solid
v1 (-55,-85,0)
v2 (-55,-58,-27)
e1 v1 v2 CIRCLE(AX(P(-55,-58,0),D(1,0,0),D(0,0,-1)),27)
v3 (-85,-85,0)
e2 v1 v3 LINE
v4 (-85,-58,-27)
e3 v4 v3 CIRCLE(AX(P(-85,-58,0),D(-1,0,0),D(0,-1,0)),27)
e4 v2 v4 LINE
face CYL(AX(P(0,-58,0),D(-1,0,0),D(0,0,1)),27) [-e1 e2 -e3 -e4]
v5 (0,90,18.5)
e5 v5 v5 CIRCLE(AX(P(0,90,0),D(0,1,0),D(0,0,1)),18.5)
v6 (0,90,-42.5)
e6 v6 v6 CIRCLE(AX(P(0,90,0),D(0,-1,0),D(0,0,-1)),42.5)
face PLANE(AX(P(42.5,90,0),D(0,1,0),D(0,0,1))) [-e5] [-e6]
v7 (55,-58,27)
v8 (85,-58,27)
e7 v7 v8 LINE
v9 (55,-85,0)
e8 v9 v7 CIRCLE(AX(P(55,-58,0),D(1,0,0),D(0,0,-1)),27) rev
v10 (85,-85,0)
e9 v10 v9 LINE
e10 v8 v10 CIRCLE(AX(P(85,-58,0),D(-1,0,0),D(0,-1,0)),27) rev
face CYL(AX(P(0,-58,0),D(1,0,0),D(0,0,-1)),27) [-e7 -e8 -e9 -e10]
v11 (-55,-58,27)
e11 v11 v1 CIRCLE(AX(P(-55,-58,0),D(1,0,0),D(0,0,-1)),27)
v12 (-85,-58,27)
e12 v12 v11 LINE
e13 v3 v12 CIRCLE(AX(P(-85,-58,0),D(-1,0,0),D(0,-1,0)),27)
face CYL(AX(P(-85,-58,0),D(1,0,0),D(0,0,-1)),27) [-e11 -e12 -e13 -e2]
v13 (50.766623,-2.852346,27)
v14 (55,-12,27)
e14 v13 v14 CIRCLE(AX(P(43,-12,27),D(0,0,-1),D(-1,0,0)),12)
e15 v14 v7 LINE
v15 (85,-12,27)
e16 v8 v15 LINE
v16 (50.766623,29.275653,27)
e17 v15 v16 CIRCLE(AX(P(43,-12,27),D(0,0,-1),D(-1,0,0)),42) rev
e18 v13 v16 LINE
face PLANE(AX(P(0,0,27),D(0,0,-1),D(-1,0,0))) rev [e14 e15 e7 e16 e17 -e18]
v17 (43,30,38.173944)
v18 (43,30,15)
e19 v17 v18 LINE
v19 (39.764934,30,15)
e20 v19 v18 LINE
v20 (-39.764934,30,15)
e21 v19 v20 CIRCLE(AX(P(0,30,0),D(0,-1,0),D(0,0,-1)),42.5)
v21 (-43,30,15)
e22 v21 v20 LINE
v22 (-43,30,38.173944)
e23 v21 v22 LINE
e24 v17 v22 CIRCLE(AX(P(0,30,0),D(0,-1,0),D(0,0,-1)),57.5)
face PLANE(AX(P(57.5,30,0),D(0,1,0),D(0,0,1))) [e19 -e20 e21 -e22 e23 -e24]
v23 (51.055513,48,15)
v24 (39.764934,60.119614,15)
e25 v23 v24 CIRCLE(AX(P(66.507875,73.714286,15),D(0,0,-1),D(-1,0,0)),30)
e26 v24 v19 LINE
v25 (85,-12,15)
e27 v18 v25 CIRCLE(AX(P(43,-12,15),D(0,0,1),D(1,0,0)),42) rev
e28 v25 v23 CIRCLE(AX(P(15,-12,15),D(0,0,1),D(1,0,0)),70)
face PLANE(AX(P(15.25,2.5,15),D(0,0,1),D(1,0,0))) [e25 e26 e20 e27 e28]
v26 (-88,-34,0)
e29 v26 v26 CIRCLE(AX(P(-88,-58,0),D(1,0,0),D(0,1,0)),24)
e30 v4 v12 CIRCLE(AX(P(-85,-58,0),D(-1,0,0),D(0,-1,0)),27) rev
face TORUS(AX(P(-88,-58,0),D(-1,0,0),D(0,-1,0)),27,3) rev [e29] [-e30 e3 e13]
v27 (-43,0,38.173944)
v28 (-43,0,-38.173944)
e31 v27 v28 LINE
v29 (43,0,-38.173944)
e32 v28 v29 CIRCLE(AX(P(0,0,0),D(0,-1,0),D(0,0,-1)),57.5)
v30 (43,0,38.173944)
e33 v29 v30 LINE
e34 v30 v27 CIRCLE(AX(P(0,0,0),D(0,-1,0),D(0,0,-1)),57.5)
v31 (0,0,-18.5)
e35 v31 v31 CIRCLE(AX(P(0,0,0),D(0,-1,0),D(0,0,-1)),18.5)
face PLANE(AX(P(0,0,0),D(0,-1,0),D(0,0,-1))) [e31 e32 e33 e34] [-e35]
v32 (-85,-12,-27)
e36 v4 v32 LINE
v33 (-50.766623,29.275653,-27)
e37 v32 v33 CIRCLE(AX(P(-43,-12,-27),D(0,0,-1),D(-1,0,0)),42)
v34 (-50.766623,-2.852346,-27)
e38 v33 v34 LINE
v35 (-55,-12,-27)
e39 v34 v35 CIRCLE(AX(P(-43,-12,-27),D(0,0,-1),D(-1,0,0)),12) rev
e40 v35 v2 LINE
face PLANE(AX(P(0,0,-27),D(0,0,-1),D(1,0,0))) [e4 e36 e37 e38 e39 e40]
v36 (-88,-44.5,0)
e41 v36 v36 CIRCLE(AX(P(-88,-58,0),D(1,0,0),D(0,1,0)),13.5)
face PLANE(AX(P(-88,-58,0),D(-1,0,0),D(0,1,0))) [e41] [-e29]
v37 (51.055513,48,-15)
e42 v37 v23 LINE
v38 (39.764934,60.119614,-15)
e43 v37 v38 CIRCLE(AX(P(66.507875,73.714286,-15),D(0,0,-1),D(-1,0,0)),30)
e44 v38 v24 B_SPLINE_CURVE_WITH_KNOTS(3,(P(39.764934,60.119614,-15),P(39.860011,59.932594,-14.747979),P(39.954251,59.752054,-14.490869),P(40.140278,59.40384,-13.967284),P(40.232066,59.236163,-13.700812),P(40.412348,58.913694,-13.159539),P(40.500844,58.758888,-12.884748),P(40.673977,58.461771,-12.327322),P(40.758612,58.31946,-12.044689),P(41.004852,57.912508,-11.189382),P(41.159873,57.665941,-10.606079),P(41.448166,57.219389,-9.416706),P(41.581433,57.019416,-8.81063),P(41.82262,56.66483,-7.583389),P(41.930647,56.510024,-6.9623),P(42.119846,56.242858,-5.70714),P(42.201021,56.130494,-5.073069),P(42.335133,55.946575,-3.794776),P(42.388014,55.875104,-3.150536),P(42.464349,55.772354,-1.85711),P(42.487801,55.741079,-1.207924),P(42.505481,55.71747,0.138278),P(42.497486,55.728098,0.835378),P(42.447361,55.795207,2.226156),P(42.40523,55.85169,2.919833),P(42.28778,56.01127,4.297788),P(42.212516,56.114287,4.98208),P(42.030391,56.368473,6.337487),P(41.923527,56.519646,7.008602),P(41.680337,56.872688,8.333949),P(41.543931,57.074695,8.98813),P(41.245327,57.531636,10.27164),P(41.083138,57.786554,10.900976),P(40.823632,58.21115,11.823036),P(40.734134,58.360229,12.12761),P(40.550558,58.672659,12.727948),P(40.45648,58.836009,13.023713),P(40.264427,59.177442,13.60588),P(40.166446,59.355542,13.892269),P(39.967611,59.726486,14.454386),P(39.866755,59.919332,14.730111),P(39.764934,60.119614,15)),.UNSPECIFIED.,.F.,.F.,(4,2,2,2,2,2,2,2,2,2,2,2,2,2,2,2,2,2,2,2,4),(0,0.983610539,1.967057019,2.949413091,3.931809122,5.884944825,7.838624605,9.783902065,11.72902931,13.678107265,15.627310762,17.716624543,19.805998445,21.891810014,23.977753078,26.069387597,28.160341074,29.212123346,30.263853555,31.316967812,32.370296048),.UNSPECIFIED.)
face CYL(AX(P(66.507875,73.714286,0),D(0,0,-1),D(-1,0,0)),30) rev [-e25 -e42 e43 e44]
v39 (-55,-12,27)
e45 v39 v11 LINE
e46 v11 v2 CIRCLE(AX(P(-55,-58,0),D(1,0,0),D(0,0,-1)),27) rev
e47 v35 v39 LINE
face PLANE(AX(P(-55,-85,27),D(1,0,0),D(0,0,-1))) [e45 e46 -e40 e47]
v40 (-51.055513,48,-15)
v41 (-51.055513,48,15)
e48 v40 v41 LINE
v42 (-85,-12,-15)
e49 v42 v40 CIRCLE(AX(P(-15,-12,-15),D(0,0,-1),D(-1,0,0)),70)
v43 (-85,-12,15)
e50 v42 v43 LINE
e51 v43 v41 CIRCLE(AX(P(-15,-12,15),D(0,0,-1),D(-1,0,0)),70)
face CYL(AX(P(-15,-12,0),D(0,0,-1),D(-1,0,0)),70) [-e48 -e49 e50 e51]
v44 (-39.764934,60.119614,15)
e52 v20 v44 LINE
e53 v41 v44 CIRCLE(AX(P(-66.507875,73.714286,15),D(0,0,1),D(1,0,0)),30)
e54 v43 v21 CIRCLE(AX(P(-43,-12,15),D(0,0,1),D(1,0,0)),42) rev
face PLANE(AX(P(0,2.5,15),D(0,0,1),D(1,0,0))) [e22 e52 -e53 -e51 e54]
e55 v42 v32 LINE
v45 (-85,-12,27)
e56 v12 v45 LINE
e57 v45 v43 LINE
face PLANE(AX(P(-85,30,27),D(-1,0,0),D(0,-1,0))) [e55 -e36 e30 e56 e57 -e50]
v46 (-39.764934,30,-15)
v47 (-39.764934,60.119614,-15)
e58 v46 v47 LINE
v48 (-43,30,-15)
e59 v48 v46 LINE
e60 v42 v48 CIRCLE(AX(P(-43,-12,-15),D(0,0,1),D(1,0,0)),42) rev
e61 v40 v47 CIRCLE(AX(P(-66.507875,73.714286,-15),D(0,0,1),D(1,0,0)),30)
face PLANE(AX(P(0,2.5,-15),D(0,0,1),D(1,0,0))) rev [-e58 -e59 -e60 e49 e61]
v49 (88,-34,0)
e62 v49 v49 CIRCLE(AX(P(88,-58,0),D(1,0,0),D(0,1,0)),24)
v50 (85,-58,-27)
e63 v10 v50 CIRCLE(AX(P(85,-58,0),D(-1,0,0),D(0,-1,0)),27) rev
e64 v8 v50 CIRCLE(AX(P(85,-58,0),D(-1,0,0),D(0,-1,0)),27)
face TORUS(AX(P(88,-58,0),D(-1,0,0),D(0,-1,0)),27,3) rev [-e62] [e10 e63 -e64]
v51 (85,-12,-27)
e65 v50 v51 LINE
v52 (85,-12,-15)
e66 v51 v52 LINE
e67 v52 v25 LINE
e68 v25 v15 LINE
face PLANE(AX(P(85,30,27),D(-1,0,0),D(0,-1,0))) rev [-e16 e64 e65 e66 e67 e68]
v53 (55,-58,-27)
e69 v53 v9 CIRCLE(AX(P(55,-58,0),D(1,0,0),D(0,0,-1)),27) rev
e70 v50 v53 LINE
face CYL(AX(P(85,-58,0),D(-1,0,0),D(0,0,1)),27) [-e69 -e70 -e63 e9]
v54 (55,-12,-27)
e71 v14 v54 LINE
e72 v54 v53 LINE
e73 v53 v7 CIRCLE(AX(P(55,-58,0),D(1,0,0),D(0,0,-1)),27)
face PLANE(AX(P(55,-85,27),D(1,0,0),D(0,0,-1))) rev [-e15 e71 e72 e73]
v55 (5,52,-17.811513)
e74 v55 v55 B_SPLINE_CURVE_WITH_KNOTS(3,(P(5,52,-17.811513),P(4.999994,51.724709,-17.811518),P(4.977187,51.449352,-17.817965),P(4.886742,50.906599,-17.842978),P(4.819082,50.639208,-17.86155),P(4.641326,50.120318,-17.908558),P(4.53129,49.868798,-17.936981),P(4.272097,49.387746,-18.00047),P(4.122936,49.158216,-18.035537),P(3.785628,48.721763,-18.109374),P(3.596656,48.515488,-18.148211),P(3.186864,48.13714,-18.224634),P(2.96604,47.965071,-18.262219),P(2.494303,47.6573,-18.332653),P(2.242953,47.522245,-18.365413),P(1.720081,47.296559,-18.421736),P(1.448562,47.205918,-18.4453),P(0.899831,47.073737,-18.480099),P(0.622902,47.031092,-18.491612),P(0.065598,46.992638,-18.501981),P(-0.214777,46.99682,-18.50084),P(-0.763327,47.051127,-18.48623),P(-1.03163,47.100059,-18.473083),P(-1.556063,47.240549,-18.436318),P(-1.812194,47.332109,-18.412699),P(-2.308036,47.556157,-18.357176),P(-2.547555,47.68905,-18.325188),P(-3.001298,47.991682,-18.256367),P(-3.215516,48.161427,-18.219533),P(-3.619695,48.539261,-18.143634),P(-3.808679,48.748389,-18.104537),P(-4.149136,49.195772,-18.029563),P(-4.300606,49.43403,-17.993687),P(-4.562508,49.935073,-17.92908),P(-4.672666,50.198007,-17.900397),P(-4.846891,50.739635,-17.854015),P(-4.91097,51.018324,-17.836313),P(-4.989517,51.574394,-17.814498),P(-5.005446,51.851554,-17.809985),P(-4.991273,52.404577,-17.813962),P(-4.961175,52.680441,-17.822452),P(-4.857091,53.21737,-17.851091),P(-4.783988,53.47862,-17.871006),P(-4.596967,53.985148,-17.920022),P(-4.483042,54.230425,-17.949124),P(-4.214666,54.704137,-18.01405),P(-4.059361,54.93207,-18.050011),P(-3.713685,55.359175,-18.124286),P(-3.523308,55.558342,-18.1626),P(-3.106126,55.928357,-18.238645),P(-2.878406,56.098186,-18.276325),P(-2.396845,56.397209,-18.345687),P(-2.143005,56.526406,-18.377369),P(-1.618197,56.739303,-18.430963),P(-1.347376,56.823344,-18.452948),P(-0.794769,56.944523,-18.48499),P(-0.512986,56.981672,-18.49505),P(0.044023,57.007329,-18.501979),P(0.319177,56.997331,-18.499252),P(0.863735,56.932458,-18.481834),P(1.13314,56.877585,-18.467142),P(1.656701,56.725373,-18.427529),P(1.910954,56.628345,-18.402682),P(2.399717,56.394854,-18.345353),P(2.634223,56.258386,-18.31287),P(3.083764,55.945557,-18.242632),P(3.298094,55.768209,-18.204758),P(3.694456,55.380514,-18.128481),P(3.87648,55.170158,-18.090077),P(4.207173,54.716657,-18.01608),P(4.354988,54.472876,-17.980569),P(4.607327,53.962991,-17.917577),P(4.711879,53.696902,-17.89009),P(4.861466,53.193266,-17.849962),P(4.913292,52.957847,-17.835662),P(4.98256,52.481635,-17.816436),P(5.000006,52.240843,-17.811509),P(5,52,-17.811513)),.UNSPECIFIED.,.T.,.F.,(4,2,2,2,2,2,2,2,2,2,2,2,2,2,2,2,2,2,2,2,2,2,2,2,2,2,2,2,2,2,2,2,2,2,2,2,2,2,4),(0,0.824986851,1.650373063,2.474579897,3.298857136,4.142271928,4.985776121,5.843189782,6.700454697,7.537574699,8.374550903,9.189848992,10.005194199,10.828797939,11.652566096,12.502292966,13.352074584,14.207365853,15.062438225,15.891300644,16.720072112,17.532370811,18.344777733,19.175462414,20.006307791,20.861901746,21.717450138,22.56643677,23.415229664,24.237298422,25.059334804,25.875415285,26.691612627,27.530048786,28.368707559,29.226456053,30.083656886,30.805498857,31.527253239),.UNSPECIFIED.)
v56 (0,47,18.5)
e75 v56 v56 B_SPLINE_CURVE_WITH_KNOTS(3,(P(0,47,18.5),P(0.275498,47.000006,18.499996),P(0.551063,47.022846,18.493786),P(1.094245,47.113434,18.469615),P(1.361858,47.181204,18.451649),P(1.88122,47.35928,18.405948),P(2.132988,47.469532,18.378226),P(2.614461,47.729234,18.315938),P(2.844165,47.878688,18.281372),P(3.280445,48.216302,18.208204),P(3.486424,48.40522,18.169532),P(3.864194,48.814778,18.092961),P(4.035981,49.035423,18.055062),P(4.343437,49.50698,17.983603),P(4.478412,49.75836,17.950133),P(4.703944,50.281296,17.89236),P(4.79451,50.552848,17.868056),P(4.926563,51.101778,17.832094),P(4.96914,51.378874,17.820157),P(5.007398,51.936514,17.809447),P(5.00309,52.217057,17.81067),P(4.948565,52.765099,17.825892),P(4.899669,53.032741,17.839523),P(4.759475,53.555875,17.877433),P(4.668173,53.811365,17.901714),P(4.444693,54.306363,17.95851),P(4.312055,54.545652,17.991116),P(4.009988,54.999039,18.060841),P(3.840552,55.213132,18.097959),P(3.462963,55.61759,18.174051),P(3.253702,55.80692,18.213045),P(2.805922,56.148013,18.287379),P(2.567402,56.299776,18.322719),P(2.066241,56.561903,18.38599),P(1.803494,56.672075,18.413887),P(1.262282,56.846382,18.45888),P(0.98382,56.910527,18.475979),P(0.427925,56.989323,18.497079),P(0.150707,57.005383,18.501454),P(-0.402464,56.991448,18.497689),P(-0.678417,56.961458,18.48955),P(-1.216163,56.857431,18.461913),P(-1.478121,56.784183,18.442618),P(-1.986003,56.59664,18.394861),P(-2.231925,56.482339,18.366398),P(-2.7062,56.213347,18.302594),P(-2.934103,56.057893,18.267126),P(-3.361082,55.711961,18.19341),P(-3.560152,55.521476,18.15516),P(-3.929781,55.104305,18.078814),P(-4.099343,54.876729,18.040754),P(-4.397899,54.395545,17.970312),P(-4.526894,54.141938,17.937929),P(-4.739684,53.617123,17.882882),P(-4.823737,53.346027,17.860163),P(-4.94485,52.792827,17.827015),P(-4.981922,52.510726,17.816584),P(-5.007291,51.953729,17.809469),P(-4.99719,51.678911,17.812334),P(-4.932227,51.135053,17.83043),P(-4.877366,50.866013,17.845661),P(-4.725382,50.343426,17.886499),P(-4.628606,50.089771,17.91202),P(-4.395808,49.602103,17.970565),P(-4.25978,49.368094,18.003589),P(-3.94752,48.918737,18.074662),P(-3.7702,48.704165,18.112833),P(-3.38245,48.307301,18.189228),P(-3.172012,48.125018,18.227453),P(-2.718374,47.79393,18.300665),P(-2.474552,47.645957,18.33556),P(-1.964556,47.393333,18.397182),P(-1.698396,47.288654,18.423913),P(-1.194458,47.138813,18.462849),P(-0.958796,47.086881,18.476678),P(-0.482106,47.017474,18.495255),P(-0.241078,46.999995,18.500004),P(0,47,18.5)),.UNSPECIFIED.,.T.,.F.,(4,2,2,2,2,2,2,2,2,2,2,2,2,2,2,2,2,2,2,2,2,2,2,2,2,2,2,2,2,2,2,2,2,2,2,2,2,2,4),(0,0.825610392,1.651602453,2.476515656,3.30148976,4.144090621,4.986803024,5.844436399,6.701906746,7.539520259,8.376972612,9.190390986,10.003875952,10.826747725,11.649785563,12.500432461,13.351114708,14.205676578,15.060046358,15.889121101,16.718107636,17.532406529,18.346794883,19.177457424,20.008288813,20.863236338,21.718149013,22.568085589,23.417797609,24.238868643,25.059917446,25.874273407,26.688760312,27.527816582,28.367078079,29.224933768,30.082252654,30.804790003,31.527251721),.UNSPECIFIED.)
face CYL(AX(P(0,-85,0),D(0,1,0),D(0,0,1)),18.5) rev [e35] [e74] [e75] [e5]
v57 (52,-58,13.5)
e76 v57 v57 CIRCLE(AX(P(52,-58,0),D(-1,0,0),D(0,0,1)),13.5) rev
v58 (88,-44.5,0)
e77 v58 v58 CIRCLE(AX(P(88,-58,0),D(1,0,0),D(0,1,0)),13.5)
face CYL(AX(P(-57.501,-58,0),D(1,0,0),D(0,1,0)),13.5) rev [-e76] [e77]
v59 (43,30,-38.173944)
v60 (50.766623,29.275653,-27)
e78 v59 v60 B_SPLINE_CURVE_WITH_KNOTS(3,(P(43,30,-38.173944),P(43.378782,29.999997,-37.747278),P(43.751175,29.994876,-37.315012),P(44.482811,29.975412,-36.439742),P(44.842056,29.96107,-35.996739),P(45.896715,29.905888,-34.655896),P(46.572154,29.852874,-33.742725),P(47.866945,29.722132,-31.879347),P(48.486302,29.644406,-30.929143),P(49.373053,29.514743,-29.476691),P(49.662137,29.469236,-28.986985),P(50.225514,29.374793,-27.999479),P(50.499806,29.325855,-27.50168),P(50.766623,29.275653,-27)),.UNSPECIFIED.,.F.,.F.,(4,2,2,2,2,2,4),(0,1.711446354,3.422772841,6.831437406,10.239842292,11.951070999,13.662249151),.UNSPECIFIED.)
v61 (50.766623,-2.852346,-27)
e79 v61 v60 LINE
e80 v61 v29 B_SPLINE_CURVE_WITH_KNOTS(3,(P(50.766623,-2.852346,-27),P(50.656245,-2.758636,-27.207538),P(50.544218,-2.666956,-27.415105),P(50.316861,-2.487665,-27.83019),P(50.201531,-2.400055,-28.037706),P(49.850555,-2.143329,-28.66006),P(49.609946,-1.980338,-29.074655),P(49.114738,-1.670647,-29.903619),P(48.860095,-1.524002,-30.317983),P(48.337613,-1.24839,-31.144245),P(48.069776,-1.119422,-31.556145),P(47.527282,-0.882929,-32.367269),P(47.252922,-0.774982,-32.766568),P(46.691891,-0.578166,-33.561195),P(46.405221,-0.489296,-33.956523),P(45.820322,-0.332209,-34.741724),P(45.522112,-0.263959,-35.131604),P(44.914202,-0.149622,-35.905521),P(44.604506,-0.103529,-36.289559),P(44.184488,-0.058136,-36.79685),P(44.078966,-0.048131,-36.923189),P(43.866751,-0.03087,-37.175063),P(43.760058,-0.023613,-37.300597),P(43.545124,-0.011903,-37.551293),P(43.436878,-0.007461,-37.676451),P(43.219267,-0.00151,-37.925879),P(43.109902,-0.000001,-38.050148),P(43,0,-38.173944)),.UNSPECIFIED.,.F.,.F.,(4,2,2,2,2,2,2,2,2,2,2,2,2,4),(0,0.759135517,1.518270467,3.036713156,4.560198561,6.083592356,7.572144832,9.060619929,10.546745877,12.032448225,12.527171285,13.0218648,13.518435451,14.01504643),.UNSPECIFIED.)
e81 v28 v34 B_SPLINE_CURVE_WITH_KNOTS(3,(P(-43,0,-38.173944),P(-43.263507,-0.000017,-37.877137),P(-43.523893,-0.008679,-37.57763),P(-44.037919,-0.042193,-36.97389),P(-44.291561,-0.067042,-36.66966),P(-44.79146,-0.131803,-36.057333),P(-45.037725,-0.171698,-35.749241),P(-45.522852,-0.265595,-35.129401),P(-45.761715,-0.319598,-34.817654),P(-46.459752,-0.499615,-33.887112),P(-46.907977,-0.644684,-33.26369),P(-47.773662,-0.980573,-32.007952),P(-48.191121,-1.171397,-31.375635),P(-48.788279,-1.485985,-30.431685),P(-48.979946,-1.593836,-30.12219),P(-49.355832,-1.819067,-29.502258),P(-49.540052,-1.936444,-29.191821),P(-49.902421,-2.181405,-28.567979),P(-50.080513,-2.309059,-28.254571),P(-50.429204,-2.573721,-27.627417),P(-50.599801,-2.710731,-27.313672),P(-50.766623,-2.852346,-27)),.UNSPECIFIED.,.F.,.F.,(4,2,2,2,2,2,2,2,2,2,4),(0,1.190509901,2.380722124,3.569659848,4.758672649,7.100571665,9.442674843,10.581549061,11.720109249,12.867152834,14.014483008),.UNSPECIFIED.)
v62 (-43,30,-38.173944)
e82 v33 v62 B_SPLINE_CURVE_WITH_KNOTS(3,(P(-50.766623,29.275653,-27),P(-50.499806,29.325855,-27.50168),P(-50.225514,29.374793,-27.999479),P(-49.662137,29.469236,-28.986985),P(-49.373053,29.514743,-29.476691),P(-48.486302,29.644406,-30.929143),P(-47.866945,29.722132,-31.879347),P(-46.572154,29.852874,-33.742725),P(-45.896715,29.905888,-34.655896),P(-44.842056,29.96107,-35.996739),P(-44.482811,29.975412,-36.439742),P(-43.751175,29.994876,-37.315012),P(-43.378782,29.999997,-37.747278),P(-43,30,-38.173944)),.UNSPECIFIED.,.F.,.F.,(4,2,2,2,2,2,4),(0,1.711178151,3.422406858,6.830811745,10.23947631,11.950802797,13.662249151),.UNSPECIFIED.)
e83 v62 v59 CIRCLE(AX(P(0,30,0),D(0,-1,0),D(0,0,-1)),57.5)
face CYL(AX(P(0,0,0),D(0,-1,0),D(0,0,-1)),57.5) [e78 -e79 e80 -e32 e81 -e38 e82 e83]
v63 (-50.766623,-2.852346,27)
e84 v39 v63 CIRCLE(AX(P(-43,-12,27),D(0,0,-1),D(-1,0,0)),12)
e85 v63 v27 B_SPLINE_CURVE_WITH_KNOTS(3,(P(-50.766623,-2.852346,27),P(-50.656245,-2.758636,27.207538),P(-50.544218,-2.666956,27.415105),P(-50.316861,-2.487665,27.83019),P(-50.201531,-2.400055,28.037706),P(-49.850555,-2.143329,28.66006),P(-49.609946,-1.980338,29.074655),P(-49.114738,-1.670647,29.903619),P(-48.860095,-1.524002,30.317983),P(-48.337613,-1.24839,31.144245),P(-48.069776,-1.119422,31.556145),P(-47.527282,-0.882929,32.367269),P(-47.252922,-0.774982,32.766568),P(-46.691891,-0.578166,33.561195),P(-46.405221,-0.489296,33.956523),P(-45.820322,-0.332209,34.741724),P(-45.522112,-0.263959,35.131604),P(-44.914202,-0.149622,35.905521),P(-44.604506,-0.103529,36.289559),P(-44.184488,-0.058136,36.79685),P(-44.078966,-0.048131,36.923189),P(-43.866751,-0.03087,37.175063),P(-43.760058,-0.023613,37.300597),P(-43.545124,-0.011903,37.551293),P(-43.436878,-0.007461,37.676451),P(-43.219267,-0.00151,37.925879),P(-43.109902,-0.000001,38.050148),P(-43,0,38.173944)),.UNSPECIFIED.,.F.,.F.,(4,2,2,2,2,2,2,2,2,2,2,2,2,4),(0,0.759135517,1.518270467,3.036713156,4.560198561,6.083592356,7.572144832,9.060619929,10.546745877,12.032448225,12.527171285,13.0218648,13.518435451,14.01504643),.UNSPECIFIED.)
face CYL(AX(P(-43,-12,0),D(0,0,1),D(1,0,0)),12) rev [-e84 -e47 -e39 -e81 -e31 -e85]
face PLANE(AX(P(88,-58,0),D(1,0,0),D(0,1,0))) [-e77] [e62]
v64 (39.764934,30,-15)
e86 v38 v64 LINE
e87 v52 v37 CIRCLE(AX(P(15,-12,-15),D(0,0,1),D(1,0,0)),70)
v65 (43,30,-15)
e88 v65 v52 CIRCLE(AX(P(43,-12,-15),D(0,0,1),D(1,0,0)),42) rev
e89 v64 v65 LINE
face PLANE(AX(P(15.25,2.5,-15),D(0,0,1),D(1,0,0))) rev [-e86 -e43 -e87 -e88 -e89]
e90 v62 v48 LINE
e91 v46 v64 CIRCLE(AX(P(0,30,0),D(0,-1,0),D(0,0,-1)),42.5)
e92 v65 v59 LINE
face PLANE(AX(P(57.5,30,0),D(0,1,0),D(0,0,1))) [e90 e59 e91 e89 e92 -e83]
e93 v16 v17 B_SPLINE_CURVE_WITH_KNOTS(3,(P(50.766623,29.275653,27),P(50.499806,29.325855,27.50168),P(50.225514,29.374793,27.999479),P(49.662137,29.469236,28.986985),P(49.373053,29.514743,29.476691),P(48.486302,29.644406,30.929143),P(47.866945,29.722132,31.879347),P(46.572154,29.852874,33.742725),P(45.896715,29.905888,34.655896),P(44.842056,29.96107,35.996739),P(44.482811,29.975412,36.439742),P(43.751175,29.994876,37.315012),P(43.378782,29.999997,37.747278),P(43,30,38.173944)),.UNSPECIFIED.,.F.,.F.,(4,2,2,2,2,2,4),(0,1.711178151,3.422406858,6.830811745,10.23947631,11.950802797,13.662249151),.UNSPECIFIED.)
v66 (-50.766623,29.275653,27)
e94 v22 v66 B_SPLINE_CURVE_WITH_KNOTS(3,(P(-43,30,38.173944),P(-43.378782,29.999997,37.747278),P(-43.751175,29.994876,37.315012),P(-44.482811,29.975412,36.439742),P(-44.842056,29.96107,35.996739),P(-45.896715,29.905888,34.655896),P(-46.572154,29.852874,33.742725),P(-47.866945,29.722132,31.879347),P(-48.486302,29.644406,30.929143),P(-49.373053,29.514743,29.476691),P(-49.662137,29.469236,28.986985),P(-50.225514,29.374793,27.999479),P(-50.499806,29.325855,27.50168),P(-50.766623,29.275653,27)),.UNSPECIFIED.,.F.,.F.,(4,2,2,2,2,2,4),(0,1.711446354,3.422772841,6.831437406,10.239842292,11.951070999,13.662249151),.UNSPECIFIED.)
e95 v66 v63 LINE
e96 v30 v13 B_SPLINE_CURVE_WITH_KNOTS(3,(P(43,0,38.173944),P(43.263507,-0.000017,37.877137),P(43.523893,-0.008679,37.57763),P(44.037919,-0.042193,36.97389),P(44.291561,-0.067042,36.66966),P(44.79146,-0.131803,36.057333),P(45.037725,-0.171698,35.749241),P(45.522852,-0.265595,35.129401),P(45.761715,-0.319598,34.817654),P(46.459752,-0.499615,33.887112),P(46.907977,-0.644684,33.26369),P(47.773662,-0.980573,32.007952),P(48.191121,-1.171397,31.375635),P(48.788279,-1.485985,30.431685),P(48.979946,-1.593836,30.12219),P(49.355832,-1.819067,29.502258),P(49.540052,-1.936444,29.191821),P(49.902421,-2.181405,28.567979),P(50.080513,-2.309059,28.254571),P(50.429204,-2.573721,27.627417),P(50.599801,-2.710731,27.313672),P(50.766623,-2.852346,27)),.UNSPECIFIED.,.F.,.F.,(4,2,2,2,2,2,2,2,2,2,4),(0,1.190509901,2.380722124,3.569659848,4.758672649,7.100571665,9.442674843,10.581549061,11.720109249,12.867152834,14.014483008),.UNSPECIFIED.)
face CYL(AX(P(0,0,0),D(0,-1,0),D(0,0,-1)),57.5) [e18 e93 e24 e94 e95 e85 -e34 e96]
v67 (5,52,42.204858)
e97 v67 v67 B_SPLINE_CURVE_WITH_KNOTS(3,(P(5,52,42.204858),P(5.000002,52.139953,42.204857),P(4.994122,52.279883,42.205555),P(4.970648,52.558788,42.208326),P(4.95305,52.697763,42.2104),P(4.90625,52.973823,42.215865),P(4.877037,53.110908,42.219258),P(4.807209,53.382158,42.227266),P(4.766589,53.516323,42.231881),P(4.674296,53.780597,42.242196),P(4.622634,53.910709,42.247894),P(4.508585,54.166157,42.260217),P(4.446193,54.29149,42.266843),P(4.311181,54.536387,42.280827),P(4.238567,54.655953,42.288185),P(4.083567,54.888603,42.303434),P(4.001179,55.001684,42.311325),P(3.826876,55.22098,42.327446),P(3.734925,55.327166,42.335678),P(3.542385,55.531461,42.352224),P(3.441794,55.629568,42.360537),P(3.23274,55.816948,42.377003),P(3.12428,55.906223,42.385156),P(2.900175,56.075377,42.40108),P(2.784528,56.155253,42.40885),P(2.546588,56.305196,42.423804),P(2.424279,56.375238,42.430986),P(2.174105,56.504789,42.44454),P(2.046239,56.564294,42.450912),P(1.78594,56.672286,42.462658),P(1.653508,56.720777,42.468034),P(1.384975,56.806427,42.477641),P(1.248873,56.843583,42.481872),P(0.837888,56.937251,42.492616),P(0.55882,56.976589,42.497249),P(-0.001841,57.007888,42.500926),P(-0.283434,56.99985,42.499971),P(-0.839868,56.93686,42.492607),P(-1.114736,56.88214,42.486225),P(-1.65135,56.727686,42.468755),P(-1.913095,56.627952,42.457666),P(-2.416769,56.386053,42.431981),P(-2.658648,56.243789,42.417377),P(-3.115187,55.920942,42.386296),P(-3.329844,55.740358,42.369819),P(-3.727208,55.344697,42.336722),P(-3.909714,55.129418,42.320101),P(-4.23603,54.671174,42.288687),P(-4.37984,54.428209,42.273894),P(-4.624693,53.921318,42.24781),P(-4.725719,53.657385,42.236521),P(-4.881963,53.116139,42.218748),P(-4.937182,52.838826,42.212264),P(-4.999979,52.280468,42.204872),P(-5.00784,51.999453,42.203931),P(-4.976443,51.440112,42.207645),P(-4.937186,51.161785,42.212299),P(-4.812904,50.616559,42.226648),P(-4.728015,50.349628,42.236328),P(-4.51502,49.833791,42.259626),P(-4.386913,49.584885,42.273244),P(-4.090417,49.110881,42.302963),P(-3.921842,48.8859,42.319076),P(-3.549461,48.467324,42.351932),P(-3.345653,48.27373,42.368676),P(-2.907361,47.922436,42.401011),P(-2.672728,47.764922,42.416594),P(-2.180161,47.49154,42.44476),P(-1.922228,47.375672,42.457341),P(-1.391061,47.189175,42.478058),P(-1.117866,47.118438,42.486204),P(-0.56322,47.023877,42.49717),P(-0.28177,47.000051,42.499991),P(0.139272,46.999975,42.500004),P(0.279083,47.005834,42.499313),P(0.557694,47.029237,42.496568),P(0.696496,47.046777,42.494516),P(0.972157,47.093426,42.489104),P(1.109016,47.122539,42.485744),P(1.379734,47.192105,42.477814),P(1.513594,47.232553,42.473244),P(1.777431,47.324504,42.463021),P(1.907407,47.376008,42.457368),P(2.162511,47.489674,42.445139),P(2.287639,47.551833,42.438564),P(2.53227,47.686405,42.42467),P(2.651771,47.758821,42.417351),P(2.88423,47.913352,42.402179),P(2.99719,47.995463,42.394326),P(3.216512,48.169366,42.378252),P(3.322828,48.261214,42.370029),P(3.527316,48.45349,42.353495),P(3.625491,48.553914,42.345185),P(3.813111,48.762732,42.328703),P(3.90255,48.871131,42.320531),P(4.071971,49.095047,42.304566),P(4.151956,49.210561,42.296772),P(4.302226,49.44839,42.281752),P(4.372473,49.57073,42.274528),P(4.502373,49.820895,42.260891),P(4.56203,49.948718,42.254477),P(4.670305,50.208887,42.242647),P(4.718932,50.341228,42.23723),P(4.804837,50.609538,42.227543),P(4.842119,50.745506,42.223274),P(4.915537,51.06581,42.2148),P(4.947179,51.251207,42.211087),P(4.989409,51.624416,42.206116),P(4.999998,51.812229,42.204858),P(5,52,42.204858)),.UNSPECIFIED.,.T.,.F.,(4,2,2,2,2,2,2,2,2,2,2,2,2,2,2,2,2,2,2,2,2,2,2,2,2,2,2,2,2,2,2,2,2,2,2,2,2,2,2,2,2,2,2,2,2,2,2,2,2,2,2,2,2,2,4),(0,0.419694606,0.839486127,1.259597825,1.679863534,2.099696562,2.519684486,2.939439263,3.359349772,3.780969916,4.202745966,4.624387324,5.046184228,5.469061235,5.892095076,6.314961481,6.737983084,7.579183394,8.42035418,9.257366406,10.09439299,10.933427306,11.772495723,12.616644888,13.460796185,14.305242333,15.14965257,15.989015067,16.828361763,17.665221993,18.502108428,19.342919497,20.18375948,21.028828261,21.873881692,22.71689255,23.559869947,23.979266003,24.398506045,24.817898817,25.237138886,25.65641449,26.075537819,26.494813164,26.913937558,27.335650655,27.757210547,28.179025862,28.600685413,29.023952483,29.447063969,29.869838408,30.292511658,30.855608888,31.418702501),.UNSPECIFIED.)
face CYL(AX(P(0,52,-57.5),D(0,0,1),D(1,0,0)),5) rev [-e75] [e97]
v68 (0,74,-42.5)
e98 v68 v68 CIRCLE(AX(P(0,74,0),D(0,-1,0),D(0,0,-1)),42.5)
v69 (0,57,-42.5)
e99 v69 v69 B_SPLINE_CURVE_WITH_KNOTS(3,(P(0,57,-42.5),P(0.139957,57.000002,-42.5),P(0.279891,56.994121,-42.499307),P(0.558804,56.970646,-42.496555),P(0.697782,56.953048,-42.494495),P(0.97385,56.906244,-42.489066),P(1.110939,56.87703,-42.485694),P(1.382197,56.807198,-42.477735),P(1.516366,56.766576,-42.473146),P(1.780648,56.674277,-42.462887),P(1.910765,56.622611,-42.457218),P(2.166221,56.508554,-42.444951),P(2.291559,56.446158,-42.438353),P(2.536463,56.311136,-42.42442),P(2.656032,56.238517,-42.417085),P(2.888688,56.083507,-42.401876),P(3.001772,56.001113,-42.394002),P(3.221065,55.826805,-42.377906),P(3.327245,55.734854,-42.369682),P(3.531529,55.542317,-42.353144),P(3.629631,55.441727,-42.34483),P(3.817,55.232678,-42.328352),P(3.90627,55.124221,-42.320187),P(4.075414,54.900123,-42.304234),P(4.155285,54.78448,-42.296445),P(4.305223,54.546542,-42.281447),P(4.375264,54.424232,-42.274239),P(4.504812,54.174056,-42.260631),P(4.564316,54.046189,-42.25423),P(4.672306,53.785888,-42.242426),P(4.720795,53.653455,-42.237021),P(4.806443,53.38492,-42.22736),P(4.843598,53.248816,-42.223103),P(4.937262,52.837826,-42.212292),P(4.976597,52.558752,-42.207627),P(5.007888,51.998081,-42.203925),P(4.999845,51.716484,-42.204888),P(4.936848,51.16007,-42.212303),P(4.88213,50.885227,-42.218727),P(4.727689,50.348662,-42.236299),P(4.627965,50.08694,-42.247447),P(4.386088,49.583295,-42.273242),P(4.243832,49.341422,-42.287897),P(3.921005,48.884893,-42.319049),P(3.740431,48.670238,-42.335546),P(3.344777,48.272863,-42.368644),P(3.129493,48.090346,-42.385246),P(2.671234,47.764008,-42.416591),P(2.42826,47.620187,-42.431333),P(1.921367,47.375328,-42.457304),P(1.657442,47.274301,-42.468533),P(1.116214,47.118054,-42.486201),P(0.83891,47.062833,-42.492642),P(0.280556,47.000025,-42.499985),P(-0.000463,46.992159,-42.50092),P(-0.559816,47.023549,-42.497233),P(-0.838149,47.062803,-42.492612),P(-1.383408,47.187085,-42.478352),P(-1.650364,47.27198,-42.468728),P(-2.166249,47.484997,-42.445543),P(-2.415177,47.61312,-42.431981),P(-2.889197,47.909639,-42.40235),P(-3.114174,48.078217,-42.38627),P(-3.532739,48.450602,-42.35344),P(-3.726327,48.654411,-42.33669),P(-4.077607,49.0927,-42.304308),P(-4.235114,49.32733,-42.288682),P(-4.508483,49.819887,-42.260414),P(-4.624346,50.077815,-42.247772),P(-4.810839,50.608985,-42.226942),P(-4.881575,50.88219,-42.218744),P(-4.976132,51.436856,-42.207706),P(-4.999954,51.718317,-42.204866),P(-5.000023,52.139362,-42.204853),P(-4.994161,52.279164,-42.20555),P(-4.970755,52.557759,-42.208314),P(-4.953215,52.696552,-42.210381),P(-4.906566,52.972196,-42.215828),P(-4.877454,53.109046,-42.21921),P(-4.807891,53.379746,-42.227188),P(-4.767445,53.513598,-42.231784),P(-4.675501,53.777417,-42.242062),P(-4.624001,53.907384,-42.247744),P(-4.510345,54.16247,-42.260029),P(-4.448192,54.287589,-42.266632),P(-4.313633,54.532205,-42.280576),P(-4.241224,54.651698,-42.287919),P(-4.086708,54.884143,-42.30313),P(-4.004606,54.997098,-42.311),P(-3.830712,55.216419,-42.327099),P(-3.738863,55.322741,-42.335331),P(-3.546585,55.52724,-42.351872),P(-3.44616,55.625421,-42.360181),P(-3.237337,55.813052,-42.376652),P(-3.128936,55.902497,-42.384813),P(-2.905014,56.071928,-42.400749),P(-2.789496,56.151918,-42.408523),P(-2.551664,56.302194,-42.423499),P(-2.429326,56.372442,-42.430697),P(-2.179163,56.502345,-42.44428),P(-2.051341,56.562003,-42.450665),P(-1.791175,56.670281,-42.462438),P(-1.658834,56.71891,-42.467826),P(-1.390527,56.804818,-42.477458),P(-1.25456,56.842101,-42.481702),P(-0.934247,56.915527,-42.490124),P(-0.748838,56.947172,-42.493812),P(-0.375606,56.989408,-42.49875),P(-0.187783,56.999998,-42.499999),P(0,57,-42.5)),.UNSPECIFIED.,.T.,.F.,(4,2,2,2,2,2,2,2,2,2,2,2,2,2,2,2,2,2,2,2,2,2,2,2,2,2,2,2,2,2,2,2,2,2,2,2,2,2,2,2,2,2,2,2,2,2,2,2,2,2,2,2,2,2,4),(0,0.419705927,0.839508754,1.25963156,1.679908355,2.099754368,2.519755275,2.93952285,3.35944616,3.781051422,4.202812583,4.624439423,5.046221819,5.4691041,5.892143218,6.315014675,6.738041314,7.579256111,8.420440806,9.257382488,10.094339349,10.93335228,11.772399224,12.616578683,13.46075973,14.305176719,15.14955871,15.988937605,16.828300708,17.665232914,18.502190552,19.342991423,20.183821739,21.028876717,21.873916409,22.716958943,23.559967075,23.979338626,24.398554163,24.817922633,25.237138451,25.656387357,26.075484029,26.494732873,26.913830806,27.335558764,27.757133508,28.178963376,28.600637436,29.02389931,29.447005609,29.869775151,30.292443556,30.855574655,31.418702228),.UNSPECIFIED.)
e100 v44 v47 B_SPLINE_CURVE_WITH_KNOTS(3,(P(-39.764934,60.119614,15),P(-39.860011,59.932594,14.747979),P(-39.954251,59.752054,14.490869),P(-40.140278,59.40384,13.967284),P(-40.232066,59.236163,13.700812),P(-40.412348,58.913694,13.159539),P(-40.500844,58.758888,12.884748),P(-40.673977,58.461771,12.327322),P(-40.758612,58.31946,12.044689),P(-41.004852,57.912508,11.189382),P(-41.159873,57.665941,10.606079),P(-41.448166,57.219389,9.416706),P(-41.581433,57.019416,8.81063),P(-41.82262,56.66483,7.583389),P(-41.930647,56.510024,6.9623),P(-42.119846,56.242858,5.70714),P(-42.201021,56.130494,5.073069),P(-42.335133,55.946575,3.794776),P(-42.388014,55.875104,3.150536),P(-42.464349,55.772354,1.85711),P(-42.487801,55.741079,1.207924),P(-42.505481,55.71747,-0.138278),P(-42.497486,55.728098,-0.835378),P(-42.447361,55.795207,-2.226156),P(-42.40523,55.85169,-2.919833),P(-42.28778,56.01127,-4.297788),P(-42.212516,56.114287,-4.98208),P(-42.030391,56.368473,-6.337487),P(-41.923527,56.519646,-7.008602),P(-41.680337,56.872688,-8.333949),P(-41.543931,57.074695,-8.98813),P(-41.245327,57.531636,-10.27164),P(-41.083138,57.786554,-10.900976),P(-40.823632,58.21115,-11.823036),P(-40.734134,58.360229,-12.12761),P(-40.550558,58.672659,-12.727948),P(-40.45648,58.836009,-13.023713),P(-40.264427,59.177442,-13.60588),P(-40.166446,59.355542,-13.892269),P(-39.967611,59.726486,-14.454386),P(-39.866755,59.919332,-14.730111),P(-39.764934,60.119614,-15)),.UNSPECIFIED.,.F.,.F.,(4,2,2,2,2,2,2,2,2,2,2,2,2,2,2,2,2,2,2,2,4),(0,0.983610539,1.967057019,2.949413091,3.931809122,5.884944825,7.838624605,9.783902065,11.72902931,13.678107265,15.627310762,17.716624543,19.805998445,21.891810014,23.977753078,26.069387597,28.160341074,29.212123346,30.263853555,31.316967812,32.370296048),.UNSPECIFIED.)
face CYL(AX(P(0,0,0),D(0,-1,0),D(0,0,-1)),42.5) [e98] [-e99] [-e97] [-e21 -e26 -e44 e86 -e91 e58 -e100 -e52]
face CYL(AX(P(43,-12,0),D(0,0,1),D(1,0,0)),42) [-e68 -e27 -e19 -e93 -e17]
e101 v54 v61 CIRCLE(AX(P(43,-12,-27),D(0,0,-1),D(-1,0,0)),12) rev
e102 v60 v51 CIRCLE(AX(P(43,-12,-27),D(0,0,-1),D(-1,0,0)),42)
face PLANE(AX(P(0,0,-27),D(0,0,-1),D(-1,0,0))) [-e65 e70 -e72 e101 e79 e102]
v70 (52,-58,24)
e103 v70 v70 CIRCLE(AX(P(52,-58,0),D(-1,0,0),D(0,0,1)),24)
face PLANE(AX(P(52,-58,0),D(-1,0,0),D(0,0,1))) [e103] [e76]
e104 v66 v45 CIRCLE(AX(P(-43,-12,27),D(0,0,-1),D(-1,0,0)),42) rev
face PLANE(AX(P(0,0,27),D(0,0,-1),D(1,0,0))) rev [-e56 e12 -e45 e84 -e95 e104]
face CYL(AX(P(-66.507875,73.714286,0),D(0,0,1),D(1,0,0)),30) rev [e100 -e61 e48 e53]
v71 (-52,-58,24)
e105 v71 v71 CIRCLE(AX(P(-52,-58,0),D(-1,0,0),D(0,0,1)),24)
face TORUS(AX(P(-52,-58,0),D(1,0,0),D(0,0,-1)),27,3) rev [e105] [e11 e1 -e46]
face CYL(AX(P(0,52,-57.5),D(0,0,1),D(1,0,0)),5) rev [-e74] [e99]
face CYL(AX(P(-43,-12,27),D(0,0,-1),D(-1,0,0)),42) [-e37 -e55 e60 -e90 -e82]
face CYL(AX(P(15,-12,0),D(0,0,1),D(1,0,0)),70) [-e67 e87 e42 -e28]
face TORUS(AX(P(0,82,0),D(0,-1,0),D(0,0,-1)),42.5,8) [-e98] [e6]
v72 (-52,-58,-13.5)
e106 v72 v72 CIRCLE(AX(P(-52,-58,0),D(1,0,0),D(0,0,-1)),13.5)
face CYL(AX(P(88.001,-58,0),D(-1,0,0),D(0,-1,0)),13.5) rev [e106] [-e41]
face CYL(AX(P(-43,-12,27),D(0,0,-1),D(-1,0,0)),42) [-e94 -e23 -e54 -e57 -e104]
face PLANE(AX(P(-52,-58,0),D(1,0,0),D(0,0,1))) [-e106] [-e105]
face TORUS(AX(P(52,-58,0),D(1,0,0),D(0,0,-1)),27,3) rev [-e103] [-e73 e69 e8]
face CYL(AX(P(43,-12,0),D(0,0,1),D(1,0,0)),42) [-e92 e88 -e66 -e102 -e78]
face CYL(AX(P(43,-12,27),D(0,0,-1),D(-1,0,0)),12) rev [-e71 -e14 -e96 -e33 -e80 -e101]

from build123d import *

# Parameters (mm, degrees)
SALIENTE_EXTRUIR1_DEPTH    = 27
REDONDEO1_R                = 42
REDONDEO2_R                = 12
REDONDEO3_R                = 27
CROQUIS3_R                 = 24
SALIENTE_EXTRUIR2_DEPTH    = 3
SALIENTE_EXTRUIR3_START    = 3
CROQUIS4_R                 = 24
SALIENTE_EXTRUIR3_DEPTH    = 3
REDONDEO4_R                = 3
CORTAR_EXTRUIR1_REACH      = 182.49
CROQUIS5_R                 = 13.5
NERVIO1_START              = -15
NERVIO1_DEPTH              = 30
CROQUIS9_R                 = 18.5
CORTAR_EXTRUIR2_DEPTH      = 205.145168964
CORTAR_EXTRUIR3_DEPTH      = 139.384428356
CORTAR_EXTRUIR3_DEPTH_BACK = 139.384428356
CROQUIS10_R                = 5


# Read off the part's stored shape, not the designer's step: Nervio1, Simetría1
with BuildPart() as part:
    # Croquis1 → Revolución1 (revolve)
    with BuildSketch(Plane.XY, mode=Mode.PRIVATE) as revoluci_n1_sk:
        with BuildLine():
            Line((0, 0), (57.5, 0))
            Line((57.5, 0), (57.5, 30))
            Line((57.5, 30), (42.5, 30))
            Line((42.5, 30), (42.5, 74))
            ThreePointArc((42.5, 74), (50.5, 82), (42.5, 90))
            Line((42.5, 90), (0, 90))
            Line((0, 90), (0, 0))
        make_face()
    revolve(revoluci_n1_sk.sketch.rotate(Axis((0, 0, 0), (0, 1, 0)), 90), axis=Axis((0, 0, 0), (0, 1, 0)))

    # Croquis2 → Saliente-Extruir1 (add, symmetric)
    with BuildSketch(Plane.XY):
        Polygon((0, 0), (0, 30), (85, 30), (85, -85), (55, -85), (55, 0), align=None)
    extrude(amount=SALIENTE_EXTRUIR1_DEPTH, both=True)

    # Redondeo1
    redondeo1_edges = [part.edges().sort_by_distance(p)[0] for p in [
        (85, 30, 0),
    ]]
    fillet(redondeo1_edges, radius=REDONDEO1_R)

    # Redondeo2
    redondeo2_edges = [part.edges().sort_by_distance(p)[0] for p in [
        (55, 0, 0),
    ]]
    fillet(redondeo2_edges, radius=REDONDEO2_R)

    # Redondeo3
    redondeo3_edges = [part.edges().sort_by_distance(p)[0] for p in [
        (70, -85, -27),
        (70, -85, 27),
    ]]
    fillet(redondeo3_edges, radius=REDONDEO3_R - 0.0001)  # a hair under: the kernel refuses the full size

    # Croquis3 → Saliente-Extruir2 (add)
    with BuildSketch(Plane(origin=(85, 0, 0), x_dir=(0, 0, -1), z_dir=(1, 0, 0))):
        with Locations(Location((0, -58, 0), (0, 0, 270))):
            Circle(CROQUIS3_R)
    extrude(amount=SALIENTE_EXTRUIR2_DEPTH)

    # Croquis4 → Saliente-Extruir3 (add)
    with BuildSketch(Plane.ZY.offset(-55).offset(SALIENTE_EXTRUIR3_START)):
        with Locations(Location((0, -58, 0), (0, 0, 270))):
            Circle(CROQUIS4_R)
    extrude(amount=-SALIENTE_EXTRUIR3_DEPTH)

    # Redondeo4
    redondeo4_edges = [part.edges().sort_by_distance(p)[0] for p in [
        (85, -34, 0),
        (55, -34, 0),
    ]]
    fillet(redondeo4_edges, radius=REDONDEO4_R - 0.0001)  # a hair under: the kernel refuses the full size

    # Croquis5 → Cortar-Extruir1 (cut, up to next)
    with BuildSketch(Plane(origin=(88, 0, 0), x_dir=(0, 0, -1), z_dir=(1, 0, 0)), mode=Mode.PRIVATE) as cortar_extruir1_sk1:
        with Locations(Location((0, -58, 0), (0, 0, 90))):
            Circle(CROQUIS5_R)
    cortar_extruir1_tool1 = extrude(cortar_extruir1_sk1.sketch, amount=-CORTAR_EXTRUIR1_REACH, mode=Mode.PRIVATE) & part.part
    add(cortar_extruir1_tool1.solids().sort_by_distance((88, -58, 0))[0], mode=Mode.SUBTRACT)

    # Nervio1 outline → Nervio1 (add)
    with BuildSketch(Plane.XY.offset(NERVIO1_START)):
        with BuildLine():
            ThreePointArc((85, -12), (75.925716626, 22.468203515), (51.055512755, 48))
            ThreePointArc((51.055512755, 48), (44.557199454, 53.26513348), (39.764934301, 60.119613841))
            Line((39.764934301, 60.119613841), (38.809047184, 62))
            Line((38.809047184, 62), (38, 62))
            Line((38, 62), (38, 30))
            Line((38, 30), (43, 30))
            ThreePointArc((43, 30), (72.69848481, 17.69848481), (85, -12))
        make_face()
    extrude(amount=NERVIO1_DEPTH)

    # Simetría1
    split(bisect_by=Plane(origin=(0, 0, 0), x_dir=(0, 0, 1), z_dir=(1, 0, 0)), keep=Keep.TOP)

    # Simetr_a1 2: part across plane


with BuildPart() as part_1:
    add(part.part)
    add(part.part.mirror(Plane(origin=(0, 0, 0), x_dir=(0, 0, 1), z_dir=(1, 0, 0))))

    # Croquis9 → Cortar-Extruir2 (cut, through all)
    with BuildSketch(Plane(origin=(0, 90, 0), x_dir=(1, 0, 0), z_dir=(0, 1, 0))):
        with Locations(Location((0, 0, 0), (0, 0, 270))):
            Circle(CROQUIS9_R)
    extrude(amount=-CORTAR_EXTRUIR2_DEPTH, mode=Mode.SUBTRACT)

    # Croquis10 → Cortar-Extruir3 (cut, two sides: drawn at the far end of the back side and taken through both)
    with BuildSketch(Plane.XY.offset(-CORTAR_EXTRUIR3_DEPTH_BACK)):
        with Locations((0, 52)):
            Circle(CROQUIS10_R)
    extrude(amount=CORTAR_EXTRUIR3_DEPTH + CORTAR_EXTRUIR3_DEPTH_BACK, mode=Mode.SUBTRACT)


solid = part_1.part
